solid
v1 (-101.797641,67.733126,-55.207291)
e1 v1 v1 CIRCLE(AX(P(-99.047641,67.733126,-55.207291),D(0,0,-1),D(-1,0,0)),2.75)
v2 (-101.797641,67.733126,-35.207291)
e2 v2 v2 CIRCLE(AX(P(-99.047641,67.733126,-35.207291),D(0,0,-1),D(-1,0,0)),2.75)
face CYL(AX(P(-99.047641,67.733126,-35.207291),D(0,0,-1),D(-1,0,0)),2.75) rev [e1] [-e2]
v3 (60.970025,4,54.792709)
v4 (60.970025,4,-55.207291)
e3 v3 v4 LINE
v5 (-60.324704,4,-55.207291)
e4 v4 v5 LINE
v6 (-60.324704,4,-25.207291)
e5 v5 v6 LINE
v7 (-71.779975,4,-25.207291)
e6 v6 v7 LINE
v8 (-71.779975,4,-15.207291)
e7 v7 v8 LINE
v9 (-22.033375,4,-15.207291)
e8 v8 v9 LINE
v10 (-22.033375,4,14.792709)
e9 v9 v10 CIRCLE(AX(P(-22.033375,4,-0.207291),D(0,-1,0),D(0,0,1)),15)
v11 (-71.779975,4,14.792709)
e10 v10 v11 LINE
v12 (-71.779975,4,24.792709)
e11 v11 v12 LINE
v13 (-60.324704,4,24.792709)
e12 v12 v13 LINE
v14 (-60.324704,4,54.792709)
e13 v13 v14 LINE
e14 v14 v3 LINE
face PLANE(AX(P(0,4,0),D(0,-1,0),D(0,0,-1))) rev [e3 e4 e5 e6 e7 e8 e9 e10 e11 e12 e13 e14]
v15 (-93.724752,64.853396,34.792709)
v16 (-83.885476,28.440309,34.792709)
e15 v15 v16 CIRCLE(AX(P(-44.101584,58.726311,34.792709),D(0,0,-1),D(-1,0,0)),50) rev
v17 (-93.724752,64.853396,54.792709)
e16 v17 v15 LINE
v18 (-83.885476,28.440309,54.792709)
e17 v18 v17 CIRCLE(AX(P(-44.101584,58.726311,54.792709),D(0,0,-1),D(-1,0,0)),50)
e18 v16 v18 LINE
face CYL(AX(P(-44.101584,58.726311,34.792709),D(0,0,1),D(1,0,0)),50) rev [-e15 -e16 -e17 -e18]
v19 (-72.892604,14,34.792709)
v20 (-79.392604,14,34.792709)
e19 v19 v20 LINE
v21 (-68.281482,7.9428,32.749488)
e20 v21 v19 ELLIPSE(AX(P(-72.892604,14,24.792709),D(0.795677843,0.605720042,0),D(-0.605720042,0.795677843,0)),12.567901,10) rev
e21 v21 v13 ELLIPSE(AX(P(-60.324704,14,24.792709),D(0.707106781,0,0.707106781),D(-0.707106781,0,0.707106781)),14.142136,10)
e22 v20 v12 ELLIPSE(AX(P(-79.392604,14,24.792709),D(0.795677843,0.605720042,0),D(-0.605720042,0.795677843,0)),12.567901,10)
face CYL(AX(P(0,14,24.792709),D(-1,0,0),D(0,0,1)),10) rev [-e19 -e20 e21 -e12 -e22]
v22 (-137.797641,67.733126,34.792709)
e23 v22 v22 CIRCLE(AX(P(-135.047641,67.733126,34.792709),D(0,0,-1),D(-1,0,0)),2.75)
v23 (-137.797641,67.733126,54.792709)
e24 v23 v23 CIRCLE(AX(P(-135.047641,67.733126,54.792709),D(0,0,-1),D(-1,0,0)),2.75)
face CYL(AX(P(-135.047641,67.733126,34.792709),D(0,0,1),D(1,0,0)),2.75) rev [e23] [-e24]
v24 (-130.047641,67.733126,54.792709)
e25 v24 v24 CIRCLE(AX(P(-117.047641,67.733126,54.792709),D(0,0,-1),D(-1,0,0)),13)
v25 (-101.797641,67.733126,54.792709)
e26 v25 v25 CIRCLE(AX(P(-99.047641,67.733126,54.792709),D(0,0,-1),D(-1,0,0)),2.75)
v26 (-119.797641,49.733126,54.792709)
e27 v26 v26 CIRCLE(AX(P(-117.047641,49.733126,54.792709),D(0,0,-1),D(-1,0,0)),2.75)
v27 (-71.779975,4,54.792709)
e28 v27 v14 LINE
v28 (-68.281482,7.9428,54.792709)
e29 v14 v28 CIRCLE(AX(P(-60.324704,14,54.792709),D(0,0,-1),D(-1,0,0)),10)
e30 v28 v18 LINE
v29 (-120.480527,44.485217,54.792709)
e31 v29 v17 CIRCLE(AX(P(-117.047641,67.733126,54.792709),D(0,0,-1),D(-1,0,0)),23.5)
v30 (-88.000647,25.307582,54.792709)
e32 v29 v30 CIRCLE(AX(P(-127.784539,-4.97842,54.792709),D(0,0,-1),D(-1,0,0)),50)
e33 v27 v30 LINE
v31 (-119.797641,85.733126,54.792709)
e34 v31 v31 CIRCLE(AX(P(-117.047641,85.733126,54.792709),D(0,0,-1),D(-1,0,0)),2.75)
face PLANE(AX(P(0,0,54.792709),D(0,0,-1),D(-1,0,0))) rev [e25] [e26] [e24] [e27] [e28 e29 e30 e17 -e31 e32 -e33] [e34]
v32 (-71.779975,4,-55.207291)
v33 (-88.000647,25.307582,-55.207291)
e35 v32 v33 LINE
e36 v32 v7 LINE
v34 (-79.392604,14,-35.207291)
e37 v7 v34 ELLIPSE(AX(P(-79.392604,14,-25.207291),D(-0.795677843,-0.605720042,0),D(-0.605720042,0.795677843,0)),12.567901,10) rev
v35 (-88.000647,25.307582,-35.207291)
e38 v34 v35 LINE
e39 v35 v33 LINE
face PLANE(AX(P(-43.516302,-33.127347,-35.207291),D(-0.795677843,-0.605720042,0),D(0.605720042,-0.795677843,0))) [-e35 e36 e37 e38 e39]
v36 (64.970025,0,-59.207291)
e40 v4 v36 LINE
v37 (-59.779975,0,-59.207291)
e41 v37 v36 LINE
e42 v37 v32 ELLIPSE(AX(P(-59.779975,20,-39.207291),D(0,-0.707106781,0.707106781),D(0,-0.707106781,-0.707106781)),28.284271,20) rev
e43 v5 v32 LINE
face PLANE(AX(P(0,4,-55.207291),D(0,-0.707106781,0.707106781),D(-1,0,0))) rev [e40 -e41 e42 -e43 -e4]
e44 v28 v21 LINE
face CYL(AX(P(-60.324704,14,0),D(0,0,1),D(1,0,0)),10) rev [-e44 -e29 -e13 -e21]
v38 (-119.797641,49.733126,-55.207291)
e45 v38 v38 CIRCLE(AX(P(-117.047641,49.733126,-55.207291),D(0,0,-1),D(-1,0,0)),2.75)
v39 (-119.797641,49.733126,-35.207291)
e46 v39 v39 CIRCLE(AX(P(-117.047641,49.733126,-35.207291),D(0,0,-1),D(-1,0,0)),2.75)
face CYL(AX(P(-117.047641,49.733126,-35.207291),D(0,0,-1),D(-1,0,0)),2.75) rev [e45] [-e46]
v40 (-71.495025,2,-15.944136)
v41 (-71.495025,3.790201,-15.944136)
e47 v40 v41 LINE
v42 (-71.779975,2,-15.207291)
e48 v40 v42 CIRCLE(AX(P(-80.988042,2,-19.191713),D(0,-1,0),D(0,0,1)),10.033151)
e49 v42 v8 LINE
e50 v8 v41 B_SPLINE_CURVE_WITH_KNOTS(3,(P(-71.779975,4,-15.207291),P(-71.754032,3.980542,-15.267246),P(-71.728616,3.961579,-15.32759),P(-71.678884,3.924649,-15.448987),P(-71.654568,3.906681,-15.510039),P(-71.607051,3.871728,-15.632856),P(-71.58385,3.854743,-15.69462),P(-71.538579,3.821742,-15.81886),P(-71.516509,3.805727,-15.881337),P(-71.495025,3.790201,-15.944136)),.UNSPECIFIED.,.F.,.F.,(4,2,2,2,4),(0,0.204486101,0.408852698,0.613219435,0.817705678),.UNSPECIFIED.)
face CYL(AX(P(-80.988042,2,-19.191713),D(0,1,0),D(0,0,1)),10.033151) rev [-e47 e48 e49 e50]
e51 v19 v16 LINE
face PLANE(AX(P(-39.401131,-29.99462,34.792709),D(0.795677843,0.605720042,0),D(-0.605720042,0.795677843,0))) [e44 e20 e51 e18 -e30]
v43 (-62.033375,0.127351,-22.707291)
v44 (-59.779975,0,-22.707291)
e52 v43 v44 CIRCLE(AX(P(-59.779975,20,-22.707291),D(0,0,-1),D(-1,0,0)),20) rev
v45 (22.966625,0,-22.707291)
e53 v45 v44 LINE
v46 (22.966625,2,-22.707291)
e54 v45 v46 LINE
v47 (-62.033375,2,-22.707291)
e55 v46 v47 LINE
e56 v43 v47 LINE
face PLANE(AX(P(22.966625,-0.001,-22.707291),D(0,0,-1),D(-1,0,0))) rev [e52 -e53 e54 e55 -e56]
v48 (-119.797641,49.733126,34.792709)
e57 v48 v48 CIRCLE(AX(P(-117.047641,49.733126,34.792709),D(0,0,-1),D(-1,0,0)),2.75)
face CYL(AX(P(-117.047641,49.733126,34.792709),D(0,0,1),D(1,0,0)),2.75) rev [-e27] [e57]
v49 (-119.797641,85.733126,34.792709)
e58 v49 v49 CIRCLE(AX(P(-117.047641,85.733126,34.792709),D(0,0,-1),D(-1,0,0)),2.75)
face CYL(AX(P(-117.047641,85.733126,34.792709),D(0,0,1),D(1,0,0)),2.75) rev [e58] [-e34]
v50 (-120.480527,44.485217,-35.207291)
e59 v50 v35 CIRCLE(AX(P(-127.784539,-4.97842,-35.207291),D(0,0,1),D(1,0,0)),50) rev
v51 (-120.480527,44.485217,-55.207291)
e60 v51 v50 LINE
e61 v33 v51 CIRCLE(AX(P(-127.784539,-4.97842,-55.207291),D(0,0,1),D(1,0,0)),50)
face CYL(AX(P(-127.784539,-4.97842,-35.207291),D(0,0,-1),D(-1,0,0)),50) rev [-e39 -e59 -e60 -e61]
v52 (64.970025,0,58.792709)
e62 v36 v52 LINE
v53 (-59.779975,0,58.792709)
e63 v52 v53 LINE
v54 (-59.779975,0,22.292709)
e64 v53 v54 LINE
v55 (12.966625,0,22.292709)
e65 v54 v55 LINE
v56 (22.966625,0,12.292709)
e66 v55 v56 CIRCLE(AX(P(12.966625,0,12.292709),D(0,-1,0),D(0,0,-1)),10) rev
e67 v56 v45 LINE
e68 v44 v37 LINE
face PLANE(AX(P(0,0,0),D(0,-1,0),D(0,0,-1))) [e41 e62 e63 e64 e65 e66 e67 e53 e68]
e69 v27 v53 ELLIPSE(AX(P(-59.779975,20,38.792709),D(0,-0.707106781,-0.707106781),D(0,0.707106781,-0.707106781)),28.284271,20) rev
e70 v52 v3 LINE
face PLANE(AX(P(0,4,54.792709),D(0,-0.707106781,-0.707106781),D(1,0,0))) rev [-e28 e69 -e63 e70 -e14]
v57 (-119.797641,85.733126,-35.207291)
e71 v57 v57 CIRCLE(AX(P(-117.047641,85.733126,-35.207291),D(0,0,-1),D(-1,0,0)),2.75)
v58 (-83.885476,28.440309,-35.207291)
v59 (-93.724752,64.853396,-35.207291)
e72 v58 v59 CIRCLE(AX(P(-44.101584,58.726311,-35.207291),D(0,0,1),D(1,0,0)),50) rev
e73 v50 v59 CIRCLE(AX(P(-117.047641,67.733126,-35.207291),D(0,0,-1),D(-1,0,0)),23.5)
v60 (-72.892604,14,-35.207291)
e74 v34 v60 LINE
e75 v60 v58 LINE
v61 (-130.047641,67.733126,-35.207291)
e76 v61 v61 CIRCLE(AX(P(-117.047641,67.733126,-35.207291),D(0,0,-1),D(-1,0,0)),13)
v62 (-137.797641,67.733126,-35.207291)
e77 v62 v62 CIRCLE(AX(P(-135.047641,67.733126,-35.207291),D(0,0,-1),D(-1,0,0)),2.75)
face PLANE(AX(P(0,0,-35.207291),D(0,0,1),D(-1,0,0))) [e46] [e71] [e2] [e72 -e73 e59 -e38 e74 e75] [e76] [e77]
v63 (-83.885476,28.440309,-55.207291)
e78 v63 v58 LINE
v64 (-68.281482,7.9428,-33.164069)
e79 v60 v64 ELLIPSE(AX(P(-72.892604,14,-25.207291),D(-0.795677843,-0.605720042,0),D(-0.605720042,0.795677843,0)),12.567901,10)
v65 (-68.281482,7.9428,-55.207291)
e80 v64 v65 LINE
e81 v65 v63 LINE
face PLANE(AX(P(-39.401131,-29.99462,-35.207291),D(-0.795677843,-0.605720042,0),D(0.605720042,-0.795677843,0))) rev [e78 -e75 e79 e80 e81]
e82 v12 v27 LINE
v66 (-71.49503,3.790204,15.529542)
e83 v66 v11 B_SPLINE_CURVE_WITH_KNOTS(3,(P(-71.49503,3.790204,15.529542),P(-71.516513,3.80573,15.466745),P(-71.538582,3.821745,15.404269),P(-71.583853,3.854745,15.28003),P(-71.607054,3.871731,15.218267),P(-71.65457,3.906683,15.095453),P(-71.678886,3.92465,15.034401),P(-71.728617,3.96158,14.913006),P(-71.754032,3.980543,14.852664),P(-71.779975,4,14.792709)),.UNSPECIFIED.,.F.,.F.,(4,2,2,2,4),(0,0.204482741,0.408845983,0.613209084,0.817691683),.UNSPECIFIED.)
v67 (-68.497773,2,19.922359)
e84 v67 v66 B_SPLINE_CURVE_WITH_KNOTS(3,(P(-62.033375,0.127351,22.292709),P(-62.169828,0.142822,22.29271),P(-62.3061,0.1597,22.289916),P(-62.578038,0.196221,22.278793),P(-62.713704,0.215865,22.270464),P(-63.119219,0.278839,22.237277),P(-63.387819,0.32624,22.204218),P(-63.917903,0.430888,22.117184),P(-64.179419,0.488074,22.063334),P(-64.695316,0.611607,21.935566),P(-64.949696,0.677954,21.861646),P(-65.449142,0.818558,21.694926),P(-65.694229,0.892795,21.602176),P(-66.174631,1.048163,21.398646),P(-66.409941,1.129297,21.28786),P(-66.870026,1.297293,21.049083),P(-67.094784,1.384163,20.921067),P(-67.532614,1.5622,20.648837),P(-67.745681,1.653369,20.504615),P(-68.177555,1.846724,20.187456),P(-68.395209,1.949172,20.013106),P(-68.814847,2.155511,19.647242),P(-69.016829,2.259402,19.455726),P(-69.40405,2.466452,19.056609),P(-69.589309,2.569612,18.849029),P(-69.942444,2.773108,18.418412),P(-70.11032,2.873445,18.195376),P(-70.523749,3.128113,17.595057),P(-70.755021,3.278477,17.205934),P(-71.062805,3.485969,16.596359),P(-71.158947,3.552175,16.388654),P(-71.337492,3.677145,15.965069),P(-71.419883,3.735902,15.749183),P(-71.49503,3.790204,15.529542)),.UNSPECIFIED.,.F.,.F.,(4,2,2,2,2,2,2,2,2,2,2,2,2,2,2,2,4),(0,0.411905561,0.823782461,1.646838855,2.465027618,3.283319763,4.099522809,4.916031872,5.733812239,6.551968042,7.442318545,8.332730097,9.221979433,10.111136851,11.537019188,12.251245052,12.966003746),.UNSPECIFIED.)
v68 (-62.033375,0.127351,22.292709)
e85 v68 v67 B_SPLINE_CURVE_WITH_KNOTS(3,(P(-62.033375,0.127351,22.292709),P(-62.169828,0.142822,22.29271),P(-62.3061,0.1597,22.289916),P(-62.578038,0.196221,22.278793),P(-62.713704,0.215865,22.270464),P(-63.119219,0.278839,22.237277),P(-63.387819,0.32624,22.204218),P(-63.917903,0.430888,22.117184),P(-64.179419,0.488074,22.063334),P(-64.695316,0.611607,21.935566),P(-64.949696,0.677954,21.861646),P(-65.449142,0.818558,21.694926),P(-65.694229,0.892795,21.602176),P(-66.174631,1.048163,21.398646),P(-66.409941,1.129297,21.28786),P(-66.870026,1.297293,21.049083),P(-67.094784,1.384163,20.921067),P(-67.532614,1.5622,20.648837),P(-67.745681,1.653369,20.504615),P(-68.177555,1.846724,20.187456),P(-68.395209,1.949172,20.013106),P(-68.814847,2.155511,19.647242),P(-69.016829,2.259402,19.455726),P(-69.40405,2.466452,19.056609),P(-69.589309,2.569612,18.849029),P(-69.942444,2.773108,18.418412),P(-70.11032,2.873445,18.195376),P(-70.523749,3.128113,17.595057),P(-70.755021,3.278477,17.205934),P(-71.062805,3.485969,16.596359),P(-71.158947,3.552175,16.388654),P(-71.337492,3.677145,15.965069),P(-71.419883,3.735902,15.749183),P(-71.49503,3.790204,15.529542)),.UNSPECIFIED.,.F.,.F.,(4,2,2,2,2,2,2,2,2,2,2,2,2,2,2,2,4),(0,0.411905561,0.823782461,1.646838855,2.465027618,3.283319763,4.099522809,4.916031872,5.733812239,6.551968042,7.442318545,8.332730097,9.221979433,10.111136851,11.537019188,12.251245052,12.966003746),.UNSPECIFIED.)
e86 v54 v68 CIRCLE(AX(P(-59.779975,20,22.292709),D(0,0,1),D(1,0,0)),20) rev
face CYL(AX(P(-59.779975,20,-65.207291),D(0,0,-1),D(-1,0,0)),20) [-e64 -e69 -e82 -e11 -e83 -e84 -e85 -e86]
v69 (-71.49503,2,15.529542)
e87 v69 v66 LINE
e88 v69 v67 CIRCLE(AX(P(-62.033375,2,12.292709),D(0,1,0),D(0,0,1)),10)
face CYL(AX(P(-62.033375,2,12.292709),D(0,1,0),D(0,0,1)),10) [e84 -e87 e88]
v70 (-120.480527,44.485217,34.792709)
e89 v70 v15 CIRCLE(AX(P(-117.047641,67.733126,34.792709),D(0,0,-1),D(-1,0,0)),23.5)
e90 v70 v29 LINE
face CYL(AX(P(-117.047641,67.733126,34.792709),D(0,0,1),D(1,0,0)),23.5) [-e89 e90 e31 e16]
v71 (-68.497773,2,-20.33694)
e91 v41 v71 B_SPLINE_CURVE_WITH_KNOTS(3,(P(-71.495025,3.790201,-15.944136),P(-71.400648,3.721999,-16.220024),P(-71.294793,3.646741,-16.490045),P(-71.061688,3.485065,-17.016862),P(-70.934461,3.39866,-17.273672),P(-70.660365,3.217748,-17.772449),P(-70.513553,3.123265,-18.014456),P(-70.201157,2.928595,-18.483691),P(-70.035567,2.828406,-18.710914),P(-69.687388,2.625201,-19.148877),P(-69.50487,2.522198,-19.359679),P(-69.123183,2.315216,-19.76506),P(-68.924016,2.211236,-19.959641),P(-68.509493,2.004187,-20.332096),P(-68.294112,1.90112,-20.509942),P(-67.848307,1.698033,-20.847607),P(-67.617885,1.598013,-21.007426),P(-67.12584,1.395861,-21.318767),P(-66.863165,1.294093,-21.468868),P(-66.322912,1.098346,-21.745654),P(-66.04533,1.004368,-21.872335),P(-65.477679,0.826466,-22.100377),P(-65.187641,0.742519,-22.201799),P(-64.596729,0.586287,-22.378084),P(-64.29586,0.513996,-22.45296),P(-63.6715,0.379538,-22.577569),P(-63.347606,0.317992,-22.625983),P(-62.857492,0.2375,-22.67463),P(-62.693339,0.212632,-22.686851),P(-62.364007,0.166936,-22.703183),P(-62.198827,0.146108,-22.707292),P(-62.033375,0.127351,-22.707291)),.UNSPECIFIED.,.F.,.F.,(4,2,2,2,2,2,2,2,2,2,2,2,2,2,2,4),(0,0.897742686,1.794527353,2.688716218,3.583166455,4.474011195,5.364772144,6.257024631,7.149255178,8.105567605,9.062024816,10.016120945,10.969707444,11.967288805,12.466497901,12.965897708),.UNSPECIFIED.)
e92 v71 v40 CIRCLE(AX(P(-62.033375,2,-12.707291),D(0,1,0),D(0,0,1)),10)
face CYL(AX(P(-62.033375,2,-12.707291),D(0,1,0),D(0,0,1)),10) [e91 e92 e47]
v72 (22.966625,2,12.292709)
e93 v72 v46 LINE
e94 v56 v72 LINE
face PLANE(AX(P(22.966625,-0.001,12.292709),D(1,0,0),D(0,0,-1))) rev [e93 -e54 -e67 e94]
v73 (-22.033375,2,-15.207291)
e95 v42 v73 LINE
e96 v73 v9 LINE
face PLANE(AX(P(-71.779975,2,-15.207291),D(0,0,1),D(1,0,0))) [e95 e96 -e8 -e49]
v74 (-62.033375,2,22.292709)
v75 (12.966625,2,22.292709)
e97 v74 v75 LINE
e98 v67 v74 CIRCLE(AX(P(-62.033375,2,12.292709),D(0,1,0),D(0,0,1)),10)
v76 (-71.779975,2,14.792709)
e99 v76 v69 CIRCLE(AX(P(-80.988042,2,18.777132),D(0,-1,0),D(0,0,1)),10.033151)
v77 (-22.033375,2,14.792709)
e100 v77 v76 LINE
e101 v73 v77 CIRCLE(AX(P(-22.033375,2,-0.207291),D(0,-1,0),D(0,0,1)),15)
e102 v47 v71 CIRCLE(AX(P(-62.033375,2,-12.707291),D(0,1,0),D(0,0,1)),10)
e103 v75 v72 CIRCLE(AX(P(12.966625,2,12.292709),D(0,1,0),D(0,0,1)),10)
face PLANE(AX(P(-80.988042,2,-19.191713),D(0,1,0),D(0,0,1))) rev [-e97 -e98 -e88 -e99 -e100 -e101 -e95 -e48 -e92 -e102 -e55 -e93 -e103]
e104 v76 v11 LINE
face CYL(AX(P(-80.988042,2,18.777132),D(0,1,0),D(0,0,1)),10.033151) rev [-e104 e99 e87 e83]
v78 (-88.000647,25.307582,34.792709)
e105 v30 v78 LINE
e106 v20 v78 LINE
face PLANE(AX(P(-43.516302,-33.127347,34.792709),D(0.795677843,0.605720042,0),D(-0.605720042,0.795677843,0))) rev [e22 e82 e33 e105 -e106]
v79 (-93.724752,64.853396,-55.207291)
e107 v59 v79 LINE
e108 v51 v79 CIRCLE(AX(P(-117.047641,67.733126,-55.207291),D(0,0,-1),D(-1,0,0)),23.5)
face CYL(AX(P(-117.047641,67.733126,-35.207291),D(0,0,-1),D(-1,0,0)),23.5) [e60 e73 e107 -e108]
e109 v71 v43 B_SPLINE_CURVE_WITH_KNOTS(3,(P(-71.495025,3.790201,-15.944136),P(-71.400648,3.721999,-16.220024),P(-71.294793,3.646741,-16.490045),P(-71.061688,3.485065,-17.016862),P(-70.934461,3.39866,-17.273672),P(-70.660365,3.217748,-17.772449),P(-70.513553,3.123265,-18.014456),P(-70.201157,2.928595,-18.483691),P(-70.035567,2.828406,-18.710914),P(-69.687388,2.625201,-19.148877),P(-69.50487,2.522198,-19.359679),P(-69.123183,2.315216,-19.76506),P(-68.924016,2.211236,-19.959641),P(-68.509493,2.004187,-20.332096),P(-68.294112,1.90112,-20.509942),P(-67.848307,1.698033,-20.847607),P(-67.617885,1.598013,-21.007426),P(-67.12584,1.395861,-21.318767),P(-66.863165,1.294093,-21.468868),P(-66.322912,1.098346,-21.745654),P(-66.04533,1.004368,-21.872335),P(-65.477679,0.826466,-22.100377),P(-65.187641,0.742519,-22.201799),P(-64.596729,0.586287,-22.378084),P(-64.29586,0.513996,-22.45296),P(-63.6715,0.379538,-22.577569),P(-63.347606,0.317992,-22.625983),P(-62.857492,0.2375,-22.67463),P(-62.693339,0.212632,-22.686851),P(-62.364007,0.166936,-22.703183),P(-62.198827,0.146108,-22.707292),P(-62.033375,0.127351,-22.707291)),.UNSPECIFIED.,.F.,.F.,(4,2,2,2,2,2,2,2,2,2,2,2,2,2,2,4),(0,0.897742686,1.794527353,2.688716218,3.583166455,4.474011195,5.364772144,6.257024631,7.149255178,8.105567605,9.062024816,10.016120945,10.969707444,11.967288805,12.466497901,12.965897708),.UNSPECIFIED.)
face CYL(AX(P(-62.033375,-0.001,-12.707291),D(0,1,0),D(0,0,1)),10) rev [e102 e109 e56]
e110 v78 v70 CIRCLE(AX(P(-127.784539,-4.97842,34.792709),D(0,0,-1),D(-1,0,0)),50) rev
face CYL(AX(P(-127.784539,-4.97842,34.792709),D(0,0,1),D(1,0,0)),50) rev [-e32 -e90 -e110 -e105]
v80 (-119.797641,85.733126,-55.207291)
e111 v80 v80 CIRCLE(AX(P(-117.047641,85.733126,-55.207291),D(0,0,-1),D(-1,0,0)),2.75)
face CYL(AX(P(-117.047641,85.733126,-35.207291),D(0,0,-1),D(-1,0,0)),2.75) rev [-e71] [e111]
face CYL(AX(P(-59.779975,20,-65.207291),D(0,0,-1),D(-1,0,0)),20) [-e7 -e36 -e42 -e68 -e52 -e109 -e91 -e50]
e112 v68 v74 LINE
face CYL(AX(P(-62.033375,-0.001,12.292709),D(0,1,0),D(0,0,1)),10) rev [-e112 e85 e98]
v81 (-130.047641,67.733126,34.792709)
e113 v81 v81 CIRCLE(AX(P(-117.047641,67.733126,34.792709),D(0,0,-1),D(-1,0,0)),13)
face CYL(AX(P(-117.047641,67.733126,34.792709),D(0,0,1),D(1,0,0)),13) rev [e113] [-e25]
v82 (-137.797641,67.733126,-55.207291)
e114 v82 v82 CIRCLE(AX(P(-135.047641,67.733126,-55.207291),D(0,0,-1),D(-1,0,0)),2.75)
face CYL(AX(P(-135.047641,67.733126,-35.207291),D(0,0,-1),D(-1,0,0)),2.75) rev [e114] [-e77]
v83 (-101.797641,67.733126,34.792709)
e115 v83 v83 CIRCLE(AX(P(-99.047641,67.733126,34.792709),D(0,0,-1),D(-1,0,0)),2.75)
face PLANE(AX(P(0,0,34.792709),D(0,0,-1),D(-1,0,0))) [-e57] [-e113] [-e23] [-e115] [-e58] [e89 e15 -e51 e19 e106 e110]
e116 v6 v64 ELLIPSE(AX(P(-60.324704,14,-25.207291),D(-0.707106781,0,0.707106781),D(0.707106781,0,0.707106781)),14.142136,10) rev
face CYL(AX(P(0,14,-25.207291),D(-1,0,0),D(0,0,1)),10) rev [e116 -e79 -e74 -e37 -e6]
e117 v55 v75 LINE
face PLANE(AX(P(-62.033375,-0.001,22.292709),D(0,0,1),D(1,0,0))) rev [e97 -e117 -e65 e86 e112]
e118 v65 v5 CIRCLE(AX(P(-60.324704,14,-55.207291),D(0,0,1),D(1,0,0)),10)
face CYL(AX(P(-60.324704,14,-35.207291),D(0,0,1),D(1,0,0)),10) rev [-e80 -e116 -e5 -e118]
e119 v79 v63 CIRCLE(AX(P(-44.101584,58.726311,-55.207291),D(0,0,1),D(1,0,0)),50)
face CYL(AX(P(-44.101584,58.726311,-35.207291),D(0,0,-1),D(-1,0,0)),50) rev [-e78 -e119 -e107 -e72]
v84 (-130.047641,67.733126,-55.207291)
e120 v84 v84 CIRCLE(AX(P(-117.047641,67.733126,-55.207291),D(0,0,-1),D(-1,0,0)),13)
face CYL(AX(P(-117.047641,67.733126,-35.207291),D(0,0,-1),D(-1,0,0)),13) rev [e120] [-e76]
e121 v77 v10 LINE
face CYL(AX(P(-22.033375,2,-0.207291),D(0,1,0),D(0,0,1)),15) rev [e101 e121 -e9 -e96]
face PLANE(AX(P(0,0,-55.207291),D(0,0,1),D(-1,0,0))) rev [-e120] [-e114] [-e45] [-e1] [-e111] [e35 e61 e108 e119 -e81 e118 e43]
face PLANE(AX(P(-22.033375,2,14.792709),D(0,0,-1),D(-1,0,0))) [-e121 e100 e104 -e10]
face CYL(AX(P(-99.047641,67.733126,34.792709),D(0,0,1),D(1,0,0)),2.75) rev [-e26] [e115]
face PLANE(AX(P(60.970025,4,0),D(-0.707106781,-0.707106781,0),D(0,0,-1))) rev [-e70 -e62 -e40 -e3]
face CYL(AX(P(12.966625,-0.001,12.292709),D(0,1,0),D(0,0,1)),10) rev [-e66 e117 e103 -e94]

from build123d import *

# Parameters (mm, degrees)
SKETCH1_W           = 142.75
SKETCH1_H           = 130
BOSS_EXTRUDE1_DEPTH = 4
CHAMFER4_SIZE       = 10
CHAMFER5_SIZE       = 10
SKETCH11_R          = 23.5
SKETCH11_R_2        = 2.75
SKETCH11_R_3        = 13
BOSS_EXTRUDE3_DEPTH = 20
CUT_EXTRUDE3_REACH  = 177.695
FILLET5_R           = 20
FILLET8_R           = 10
FILLET9_R           = 50
BOSS_EXTRUDE5_DEPTH = 2


with BuildPart() as part:
    # Sketch1 → Boss-Extrude1 (new body)
    with BuildSketch(Plane(origin=(0, 0, 0), x_dir=(1, 0, 0), z_dir=(0, 1, 0))):
        with Locations((-0.404975067, 0.207290513)):
            Rectangle(SKETCH1_W, SKETCH1_H)
    extrude(amount=BOSS_EXTRUDE1_DEPTH)

    # Chamfer4
    # the kernel refuses this chamfer: 10 mm, written as the material it takes off along each edge
    with BuildSketch(Plane(origin=(-97.496804946, 4, -65.207290513), x_dir=(0, -1, 0), z_dir=(1, 0, 0)), Plane(origin=(96.686854813, 4, 64.792709487), x_dir=(0, -1, 0), z_dir=(-1, 0, 0))) as chamfer4_piece_1:
        Polygon((CHAMFER4_SIZE, 0), (0, -CHAMFER4_SIZE), (0, 0), align=None)
    extrude(amount=194.183659759, mode=Mode.SUBTRACT)

    # Chamfer5
    # the kernel refuses this chamfer: 10 mm, written as the material it takes off along each edge
    with BuildSketch(Plane(origin=(70.970024933, 4, -80.924120393), x_dir=(-1, 0, 0), z_dir=(0, 0, 1))) as chamfer5_piece_1:
        Polygon((CHAMFER5_SIZE, 0), (0, CHAMFER5_SIZE), (0, 0), align=None)
    extrude(amount=161.433659759, mode=Mode.SUBTRACT)

    # Sketch11 → Boss-Extrude3 (add)
    # profile 1 of 2: a face of its own
    with BuildSketch(Plane(origin=(0, 0, 54.792709487), x_dir=(-1, 0, 0), z_dir=(0, 0, -1))):
        with Locations((117.047641156, 67.733126253)):
            Circle(SKETCH11_R)
        with Locations((99.047641156, 67.733126253)):
            Circle(SKETCH11_R_2, mode=Mode.SUBTRACT)
        with Locations((117.047641156, 85.733126253)):
            Circle(SKETCH11_R_2, mode=Mode.SUBTRACT)
        with Locations((135.047641156, 67.733126253)):
            Circle(SKETCH11_R_2, mode=Mode.SUBTRACT)
        with Locations((117.047641156, 49.733126253)):
            Circle(SKETCH11_R_2, mode=Mode.SUBTRACT)
        with Locations((117.047641156, 67.733126253)):
            Circle(SKETCH11_R_3, mode=Mode.SUBTRACT)
    # profile 2 of 2: a face of its own
    with BuildSketch(Plane(origin=(0, 0, 54.792709487), x_dir=(-1, 0, 0), z_dir=(0, 0, -1))):
        Polygon((65.279975067, 4), (71.779975067, 4), (110.625146065, 55.02727289), (106.509975067, 58.16), align=None)
    boss_extrude3 = extrude(amount=BOSS_EXTRUDE3_DEPTH)

    # Sketch12 → Cut-Extrude3 (cut, up to next)
    with BuildSketch(Plane(origin=(0, 4, 0), x_dir=(1, 0, 0), z_dir=(0, 1, 0)), mode=Mode.PRIVATE) as cut_extrude3_sk1:
        with BuildLine():
            Line((-62.033374936, -22.292709487), (12.966625064, -22.292709487))
            ThreePointArc((12.966625064, -22.292709487), (20.037692876, -19.363777299), (22.966625064, -12.292709487))
            Line((22.966625064, -12.292709487), (22.966625064, 22.707290513))
            Line((22.966625064, 22.707290513), (-62.033374936, 22.707290513))
            ThreePointArc((-62.033374936, 22.707290513), (-67.848507835, 20.84265955), (-71.495025362, 15.944136388))
            ThreePointArc((-71.495025362, 15.944136388), (-71.630244869, 15.572907696), (-71.779975067, 15.207290513))
            Line((-71.779975067, 15.207290513), (-71.779975067, -14.792709487))
            ThreePointArc((-71.779975067, -14.792709487), (-71.630247327, -15.158320315), (-71.495029773, -15.529542467))
            ThreePointArc((-71.495029773, -15.529542467), (-67.848513378, -20.428074562), (-62.033374936, -22.292709487))
        make_face()
    cut_extrude3_tool1 = extrude(cut_extrude3_sk1.sketch, amount=-CUT_EXTRUDE3_REACH, mode=Mode.PRIVATE) & part.part
    add(cut_extrude3_tool1.solids().sort_by_distance((-24.222891, 4, -0.310755))[0], mode=Mode.SUBTRACT)

    # Fillet5
    # the kernel refuses this fillet: 20 mm, written as the material it takes off along each edge
    with BuildSketch(Plane(origin=(-71.779975067, 0, 14.792709487), x_dir=(1, 0, 0), z_dir=(0, 0, -1))) as fillet5_piece_1:
        with BuildLine():
            CenterArc((12, -20), FILLET5_R, 90, 36.869897646)
            Line((0, -4), (-0.24, -3.68))
            ThreePointArc((-0.24, -3.68), (-0.4, -2), (-0.4, 0))
            Line((-0.4, 0), (0, 0.4))
            Line((0, 0.4), (12, 0.4))
            Line((12, 0.4), (12, 0))
        make_face()
    extrude(amount=104, mode=Mode.SUBTRACT)
    with BuildSketch(Plane(origin=(-71.779975067, 0, 88.792709487), x_dir=(0, 1, 0), z_dir=(0, 0, -1))) as fillet5_piece_2:
        with BuildLine():
            CenterArc((20, 12), FILLET5_R, 180, 36.869897646)
            Line((0, 12), (-0.4, 12))
            Line((-0.4, 12), (-0.4, 0))
            Line((-0.4, 0), (0, -0.4))
            ThreePointArc((0, -0.4), (2, -0.4), (3.68, -0.24))
            Line((3.68, -0.24), (4, 0))
        make_face()
    extrude(amount=104, mode=Mode.SUBTRACT)

    # Mirror3: Boss-Extrude3 across plane
    add(boss_extrude3.mirror(Plane.XY.offset(-0.207290513)))

    # Fillet8
    # the kernel refuses this fillet: 10 mm, written as the material it adds along each edge
    with BuildSketch(Plane(origin=(-40.279975067, 4, -35.207290513), x_dir=(0, 0, 1), z_dir=(-1, 0, 0))) as fillet8_piece_1_section:
        with BuildLine():
            CenterArc((FILLET8_R, FILLET8_R), FILLET8_R, 180, 90)
            Line((0, FILLET8_R), (0, 0))
            Line((0, 0), (FILLET8_R, 0))
        make_face()
    fillet8_piece_1 = extrude(amount=56.5, mode=Mode.PRIVATE)
    fillet8_piece_1 = split(fillet8_piece_1, bisect_by=Plane(origin=(-56.107555829, -8.048950422, -35.207290513), z_dir=(-0.7956778434191335, -0.6057200421744992, 0)), keep=Keep.TOP, mode=Mode.PRIVATE)
    fillet8_piece_1 = split(fillet8_piece_1, bisect_by=Plane(origin=(-60.222726828, -11.181677532, -35.207290513), z_dir=(0.7956778434191335, 0.605720042174499, 0)), keep=Keep.TOP, mode=Mode.PRIVATE)
    add(fillet8_piece_1)
    with BuildSketch(Plane(origin=(-65.279975067, 4, -55.207290513), x_dir=(1, 0, 0), z_dir=(0, 0, 1))) as fillet8_piece_2:
        with BuildLine():
            CenterArc((FILLET8_R * 0.495527129587, FILLET8_R), FILLET8_R, 217.280673383, 52.719326617)
            Line((-FILLET8_R * 0.300150713832, FILLET8_R * 0.394279957825), (0, 0))
            Line((0, 0), (FILLET8_R * 0.495527129587, 0))
        make_face()
    extrude(amount=20)
    with BuildSketch(Plane(origin=(-65.279975067, 4, 54.792709487), x_dir=(1, 0, 0), z_dir=(0, 0, -1))) as fillet8_piece_3:
        with BuildLine():
            CenterArc((FILLET8_R * 0.495527129587, -FILLET8_R), FILLET8_R, 90, 52.719326617)
            Line((-FILLET8_R * 0.300150713832, -FILLET8_R * 0.394279957825), (0, 0))
            Line((0, 0), (FILLET8_R * 0.495527129587, 0))
        make_face()
    extrude(amount=20)
    with BuildSketch(Plane(origin=(-40.279975067, 4, 34.792709487), x_dir=(0, 0, -1), z_dir=(-1, 0, 0))) as fillet8_piece_4_section:
        with BuildLine():
            CenterArc((FILLET8_R, -FILLET8_R), FILLET8_R, 90, 90)
            Line((0, -FILLET8_R), (0, 0))
            Line((0, 0), (FILLET8_R, 0))
        make_face()
    fillet8_piece_4 = extrude(amount=56.5, mode=Mode.PRIVATE)
    fillet8_piece_4 = split(fillet8_piece_4, bisect_by=Plane(origin=(-56.107555829, -8.048950422, 34.792709487), z_dir=(-0.7956778434191335, -0.6057200421744992, 0)), keep=Keep.TOP, mode=Mode.PRIVATE)
    fillet8_piece_4 = split(fillet8_piece_4, bisect_by=Plane(origin=(-60.222726828, -11.181677532, 34.792709487), z_dir=(0.7956778434191335, 0.605720042174499, 0)), keep=Keep.TOP, mode=Mode.PRIVATE)
    add(fillet8_piece_4)
    with BuildSketch(Plane(origin=(-65.279975067, 4, -55.207290513), x_dir=(1, 0, 0), z_dir=(0, 0, 1))) as fillet8_piece_5a_section:
        with BuildLine():
            CenterArc((FILLET8_R * 0.495527129587, FILLET8_R), FILLET8_R, 217.280673383, 52.719326617)
            Line((-FILLET8_R * 0.300150713832, FILLET8_R * 0.394279957825), (0, 0))
            Line((0, 0), (FILLET8_R * 0.495527129587, 0))
        make_face()
    fillet8_piece_5a = extrude(amount=32.38817824, mode=Mode.PRIVATE)
    fillet8_piece_5a = split(fillet8_piece_5a, bisect_by=Plane(origin=(-65.279975067, 4, -35.207290513), z_dir=(0, 0, 1)), keep=Keep.TOP, mode=Mode.PRIVATE)
    with BuildSketch(Plane(origin=(-40.279975067, 4, -35.207290513), x_dir=(0, 0, 1), z_dir=(-1, 0, 0))) as fillet8_piece_5b_section:
        with BuildLine():
            CenterArc((FILLET8_R, FILLET8_R), FILLET8_R, 180, 90)
            Line((0, FILLET8_R), (0, 0))
            Line((0, 0), (FILLET8_R, 0))
        make_face()
    fillet8_piece_5b = extrude(amount=56.5, mode=Mode.PRIVATE)
    fillet8_piece_5b = split(fillet8_piece_5b, bisect_by=Plane(origin=(-56.107555829, -8.048950422, -35.207290513), z_dir=(0.7956778434191335, 0.6057200421744992, 0)), keep=Keep.TOP, mode=Mode.PRIVATE)
    fillet8_piece_5b = fillet8_piece_5b & Plane(origin=(-59.779975067, 20, -35.207290513), x_dir=(1, 0, 0), z_dir=(0, 0, 1)) * Cylinder(20, 154, mode=Mode.PRIVATE)
    fillet8_piece_5 = fillet8_piece_5a & fillet8_piece_5b
    add(fillet8_piece_5)
    with BuildSketch(Plane(origin=(-40.279975067, 4, 34.792709487), x_dir=(0, 0, -1), z_dir=(-1, 0, 0))) as fillet8_piece_6a_section:
        with BuildLine():
            CenterArc((FILLET8_R, -FILLET8_R), FILLET8_R, 90, 90)
            Line((0, -FILLET8_R), (0, 0))
            Line((0, 0), (FILLET8_R, 0))
        make_face()
    fillet8_piece_6a = extrude(amount=56.5, mode=Mode.PRIVATE)
    fillet8_piece_6a = fillet8_piece_6a & Plane(origin=(-59.779975067, 20, 34.792709487), x_dir=(0, 1, 0), z_dir=(0, 0, 1)) * Cylinder(20, 154, mode=Mode.PRIVATE)
    fillet8_piece_6a = split(fillet8_piece_6a, bisect_by=Plane(origin=(-56.107555829, -8.048950422, 34.792709487), z_dir=(0.7956778434191335, 0.6057200421744992, 0)), keep=Keep.TOP, mode=Mode.PRIVATE)
    with BuildSketch(Plane(origin=(-65.279975067, 4, 54.792709487), x_dir=(1, 0, 0), z_dir=(0, 0, -1))) as fillet8_piece_6b_section:
        with BuildLine():
            CenterArc((FILLET8_R * 0.495527129587, -FILLET8_R), FILLET8_R, 90, 52.719326617)
            Line((-FILLET8_R * 0.300150713832, -FILLET8_R * 0.394279957825), (0, 0))
            Line((0, 0), (FILLET8_R * 0.495527129587, 0))
        make_face()
    fillet8_piece_6b = extrude(amount=32.38817824, mode=Mode.PRIVATE)
    fillet8_piece_6b = split(fillet8_piece_6b, bisect_by=Plane(origin=(-65.279975067, 4, 34.792709487), z_dir=(0, 0, -1)), keep=Keep.TOP, mode=Mode.PRIVATE)
    fillet8_piece_6 = fillet8_piece_6a & fillet8_piece_6b
    add(fillet8_piece_6)

    # Fillet9
    fillet9_edges = [part.edges().sort_by_distance(p)[0] for p in [
        (-104.957249904, 47.581887101, -45.207290513),
        (-100.842078905, 50.714614211, -45.207290513),
        (-104.957249904, 47.581887101, 44.792709487),
        (-100.842078905, 50.714614211, 44.792709487),
    ]]
    fillet(fillet9_edges, radius=FILLET9_R)

    # Sketch14 → Boss-Extrude5 (add)
    with BuildSketch(Plane(origin=(0, 4, 0), x_dir=(1, 0, 0), z_dir=(0, 1, 0))):
        with BuildLine():
            Line((-71.779975067, 15.207290513), (-22.033374936, 15.207290513))
            ThreePointArc((-22.033374936, 15.207290513), (-7.033374936, 0.207290513), (-22.033374936, -14.792709487))
            Line((-22.033374936, -14.792709487), (-71.779975067, -14.792709487))
            ThreePointArc((-71.779975067, -14.792709487), (-71.630247327, -15.158320315), (-71.495029773, -15.529542467))
            ThreePointArc((-71.495029773, -15.529542467), (-67.848513378, -20.428074562), (-62.033374936, -22.292709487))
            Line((-62.033374936, -22.292709487), (12.966625064, -22.292709487))
            ThreePointArc((12.966625064, -22.292709487), (20.037692876, -19.363777299), (22.966625064, -12.292709487))
            Line((22.966625064, -12.292709487), (22.966625064, 22.707290513))
            Line((22.966625064, 22.707290513), (-62.033374936, 22.707290513))
            ThreePointArc((-62.033374936, 22.707290513), (-67.848507835, 20.84265955), (-71.495025362, 15.944136388))
            ThreePointArc((-71.495025362, 15.944136388), (-71.630244869, 15.572907696), (-71.779975067, 15.207290513))
        make_face()
    extrude(amount=-BOSS_EXTRUDE5_DEPTH)


solid = part.part
